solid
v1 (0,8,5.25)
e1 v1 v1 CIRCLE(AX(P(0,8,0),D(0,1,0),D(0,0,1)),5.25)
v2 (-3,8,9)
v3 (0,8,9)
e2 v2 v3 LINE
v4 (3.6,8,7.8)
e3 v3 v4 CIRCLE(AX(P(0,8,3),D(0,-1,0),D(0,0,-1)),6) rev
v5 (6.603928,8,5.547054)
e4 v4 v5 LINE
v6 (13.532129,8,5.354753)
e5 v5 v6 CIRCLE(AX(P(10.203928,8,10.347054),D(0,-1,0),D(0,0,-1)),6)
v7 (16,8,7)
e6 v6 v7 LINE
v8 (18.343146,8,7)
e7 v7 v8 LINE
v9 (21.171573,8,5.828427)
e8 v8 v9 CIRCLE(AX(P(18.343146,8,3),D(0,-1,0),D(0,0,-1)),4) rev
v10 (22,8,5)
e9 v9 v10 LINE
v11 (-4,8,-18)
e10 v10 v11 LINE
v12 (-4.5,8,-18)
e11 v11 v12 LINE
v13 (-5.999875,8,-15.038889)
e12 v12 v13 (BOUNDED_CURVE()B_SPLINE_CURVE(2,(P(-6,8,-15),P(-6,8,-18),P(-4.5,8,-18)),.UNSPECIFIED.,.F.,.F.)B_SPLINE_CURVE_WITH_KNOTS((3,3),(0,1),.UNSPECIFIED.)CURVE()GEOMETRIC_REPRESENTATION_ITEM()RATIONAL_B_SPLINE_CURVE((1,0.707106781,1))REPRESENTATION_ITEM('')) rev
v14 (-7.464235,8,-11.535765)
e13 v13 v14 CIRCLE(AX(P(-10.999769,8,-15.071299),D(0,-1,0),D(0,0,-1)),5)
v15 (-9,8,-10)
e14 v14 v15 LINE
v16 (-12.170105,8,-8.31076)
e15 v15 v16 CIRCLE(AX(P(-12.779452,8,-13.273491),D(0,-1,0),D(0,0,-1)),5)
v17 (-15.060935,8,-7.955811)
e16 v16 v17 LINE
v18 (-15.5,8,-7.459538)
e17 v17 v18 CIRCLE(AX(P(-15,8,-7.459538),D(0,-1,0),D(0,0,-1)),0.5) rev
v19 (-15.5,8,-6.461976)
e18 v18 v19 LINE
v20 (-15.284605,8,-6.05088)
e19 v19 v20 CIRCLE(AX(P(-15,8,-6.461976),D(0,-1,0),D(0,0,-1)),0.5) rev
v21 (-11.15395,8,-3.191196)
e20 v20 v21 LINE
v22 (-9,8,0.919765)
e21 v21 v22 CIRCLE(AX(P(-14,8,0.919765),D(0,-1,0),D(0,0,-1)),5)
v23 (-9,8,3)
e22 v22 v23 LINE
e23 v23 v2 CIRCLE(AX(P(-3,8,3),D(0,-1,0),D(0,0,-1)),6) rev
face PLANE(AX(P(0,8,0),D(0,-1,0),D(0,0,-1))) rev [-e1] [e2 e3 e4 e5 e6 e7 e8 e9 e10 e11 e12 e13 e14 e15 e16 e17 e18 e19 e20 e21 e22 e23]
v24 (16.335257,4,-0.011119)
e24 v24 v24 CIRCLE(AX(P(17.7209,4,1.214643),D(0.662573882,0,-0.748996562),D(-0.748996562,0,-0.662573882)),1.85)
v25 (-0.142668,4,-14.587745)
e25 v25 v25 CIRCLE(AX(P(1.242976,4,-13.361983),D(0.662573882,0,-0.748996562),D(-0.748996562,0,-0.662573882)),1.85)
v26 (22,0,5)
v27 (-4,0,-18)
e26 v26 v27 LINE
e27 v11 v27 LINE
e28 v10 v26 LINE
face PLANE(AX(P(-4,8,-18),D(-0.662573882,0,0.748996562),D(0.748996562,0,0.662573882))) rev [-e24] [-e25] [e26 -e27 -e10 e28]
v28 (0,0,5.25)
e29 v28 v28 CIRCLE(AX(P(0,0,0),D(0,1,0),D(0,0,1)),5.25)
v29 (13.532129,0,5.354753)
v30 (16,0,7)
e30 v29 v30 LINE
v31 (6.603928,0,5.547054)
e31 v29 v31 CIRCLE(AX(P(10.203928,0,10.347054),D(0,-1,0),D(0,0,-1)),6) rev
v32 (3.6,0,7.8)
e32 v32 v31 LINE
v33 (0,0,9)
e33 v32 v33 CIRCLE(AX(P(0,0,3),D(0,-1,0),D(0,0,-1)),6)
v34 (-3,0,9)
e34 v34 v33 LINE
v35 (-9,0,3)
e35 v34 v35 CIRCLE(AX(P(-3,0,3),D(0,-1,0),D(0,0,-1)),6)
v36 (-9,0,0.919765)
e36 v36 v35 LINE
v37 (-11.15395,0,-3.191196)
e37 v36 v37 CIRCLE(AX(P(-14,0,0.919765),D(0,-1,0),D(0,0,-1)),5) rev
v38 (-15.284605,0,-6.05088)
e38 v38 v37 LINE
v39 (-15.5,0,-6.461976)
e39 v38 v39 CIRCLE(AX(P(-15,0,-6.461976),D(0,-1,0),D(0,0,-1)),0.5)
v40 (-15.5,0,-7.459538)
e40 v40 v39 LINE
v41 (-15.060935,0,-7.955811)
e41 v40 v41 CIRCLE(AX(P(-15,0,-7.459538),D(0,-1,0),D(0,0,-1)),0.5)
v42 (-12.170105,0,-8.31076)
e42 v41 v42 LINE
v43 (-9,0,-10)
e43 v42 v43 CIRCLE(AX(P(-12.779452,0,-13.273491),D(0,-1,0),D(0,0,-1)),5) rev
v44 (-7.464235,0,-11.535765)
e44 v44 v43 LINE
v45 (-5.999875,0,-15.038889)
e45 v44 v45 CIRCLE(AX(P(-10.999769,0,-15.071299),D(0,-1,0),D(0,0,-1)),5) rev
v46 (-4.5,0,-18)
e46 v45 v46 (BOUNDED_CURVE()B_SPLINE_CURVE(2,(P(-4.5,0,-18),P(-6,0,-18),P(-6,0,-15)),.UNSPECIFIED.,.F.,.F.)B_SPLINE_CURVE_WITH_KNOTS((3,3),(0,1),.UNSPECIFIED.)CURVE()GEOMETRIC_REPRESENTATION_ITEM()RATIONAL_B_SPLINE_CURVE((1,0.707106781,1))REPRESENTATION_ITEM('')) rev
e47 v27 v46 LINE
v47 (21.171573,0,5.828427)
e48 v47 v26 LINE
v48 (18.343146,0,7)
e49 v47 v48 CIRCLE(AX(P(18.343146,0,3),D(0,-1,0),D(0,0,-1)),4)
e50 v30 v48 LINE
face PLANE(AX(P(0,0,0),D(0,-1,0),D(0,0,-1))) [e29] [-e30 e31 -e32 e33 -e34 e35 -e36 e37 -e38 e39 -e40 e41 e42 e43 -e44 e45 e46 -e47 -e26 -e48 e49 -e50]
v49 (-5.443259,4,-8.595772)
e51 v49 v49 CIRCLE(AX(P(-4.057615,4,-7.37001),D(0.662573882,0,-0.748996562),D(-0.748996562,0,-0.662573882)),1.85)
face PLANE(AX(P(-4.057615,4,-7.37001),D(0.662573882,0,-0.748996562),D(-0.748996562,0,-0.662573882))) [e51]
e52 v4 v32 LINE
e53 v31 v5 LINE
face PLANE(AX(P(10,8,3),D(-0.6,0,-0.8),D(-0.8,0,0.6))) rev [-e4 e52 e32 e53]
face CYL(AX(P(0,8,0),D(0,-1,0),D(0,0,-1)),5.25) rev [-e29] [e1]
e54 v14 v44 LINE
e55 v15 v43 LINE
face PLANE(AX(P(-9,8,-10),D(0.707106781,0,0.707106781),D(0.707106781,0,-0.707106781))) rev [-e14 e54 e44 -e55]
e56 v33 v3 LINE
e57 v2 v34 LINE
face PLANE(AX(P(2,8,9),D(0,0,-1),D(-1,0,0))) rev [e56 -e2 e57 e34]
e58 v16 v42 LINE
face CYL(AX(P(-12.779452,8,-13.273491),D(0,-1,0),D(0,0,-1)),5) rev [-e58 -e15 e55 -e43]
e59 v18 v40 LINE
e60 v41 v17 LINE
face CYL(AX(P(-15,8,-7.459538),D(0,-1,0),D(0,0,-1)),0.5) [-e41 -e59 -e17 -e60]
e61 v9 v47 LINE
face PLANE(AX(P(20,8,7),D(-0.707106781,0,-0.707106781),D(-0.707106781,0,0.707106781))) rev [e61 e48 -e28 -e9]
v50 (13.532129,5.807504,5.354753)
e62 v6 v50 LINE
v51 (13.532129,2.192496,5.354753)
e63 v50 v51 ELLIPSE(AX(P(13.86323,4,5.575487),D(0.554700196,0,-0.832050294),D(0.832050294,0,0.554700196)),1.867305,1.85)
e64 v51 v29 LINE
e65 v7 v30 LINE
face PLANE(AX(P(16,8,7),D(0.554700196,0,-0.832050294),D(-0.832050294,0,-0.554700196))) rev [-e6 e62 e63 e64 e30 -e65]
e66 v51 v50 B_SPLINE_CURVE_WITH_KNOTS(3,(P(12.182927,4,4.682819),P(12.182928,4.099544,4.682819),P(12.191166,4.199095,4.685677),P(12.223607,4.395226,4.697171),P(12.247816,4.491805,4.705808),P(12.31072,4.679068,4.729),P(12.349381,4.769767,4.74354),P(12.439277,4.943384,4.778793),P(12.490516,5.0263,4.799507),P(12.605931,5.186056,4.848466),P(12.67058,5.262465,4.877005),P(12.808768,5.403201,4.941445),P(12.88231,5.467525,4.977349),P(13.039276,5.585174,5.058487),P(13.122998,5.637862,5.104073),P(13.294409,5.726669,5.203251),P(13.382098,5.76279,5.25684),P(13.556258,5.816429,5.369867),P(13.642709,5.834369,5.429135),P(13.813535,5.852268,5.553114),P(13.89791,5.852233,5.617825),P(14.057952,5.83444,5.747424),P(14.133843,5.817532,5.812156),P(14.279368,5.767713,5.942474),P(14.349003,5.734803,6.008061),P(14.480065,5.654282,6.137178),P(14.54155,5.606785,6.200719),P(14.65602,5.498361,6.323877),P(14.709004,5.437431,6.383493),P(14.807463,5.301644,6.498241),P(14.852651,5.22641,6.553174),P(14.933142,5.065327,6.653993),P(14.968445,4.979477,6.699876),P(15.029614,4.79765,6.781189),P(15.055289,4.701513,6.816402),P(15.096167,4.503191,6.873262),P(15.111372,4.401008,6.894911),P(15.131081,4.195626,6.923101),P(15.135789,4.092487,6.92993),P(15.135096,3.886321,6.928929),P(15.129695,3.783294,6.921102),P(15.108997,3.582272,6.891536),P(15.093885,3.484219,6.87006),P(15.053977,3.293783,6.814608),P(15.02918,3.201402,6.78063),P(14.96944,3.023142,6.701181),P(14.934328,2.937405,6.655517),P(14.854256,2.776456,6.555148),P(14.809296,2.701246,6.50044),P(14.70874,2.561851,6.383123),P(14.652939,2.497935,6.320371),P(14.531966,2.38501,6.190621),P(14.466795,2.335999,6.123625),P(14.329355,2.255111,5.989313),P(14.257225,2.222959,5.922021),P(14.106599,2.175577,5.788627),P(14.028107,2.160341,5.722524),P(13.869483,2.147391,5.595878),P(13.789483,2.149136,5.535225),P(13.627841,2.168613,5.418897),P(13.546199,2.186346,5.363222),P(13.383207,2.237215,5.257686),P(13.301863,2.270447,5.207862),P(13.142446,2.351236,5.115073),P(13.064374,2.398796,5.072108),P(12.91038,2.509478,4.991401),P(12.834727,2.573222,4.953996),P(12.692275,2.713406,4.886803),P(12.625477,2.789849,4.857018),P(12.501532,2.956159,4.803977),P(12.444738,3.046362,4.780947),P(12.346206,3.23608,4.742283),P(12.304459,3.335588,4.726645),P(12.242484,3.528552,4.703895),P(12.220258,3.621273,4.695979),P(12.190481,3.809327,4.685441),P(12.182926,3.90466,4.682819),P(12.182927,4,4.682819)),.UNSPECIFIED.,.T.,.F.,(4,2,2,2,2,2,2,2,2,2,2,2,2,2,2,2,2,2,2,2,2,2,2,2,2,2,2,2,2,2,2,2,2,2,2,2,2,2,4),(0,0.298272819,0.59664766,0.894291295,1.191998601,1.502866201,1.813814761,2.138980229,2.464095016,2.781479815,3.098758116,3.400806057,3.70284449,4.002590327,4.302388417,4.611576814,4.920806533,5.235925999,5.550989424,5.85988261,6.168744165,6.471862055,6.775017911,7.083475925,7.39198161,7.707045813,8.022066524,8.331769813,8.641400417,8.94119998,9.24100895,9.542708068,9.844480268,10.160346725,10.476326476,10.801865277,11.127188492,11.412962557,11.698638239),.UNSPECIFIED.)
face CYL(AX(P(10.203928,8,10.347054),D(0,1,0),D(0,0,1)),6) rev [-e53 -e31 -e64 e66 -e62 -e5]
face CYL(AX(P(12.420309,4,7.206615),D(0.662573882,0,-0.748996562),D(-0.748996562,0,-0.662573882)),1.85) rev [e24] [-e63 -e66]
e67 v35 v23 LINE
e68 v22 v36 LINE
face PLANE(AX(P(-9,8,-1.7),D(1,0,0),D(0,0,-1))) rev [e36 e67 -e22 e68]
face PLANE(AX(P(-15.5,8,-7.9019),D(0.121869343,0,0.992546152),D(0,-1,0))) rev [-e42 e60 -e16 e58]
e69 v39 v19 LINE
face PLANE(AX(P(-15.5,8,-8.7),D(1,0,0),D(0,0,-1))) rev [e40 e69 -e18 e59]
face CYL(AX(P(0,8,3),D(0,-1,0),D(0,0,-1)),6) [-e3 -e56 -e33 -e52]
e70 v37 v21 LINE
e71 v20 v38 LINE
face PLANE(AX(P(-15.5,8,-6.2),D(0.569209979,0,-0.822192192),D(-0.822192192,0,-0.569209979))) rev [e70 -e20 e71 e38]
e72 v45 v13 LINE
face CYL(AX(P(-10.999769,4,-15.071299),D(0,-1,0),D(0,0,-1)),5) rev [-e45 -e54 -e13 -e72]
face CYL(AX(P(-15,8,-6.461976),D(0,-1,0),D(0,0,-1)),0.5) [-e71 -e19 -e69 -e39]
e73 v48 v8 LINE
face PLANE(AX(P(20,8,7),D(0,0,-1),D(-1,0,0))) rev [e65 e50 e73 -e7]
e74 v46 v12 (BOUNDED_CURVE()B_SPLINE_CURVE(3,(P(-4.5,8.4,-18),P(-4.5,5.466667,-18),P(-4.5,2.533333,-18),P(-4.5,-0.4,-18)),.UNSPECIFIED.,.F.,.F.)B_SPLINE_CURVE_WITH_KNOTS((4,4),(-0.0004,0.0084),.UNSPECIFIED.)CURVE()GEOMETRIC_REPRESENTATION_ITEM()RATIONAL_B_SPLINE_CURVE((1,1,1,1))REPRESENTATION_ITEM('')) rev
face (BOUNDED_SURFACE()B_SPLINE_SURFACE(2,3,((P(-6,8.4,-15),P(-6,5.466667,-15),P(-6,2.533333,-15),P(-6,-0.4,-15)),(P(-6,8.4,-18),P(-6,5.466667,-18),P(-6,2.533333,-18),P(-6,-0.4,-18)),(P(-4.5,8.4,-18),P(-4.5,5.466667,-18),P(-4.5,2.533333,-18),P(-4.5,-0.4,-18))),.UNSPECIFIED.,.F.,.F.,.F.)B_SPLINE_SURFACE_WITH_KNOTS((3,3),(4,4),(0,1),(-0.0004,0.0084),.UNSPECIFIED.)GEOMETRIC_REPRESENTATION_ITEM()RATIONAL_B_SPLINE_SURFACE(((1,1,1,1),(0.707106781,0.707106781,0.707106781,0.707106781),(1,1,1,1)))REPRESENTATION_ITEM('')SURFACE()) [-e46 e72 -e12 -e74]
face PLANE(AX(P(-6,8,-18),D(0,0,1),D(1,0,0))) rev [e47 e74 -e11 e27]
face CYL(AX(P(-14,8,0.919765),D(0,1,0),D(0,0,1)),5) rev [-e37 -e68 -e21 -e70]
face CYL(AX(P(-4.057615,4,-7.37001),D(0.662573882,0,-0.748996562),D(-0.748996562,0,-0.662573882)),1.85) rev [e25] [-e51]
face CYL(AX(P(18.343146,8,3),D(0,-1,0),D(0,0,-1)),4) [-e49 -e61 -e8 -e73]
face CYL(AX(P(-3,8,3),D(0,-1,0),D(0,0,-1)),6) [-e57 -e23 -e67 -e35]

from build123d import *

# Parameters (mm, degrees)
SKETCH1_R           = 5.25
BOSS_EXTRUDE1_DEPTH = 8
FILLET1_SIZE        = 1.5
FILLET1_SIZE_2      = 3
FILLET2_R           = 5
CHAMFER1_SIZE2      = 0.798099646
CHAMFER1_SIZE       = 6.5
FILLET4_DEPTH       = 8
FILLET5_R           = 0.5
FILLET6_R           = 6
SKETCH2_R           = 1.85
CUT_EXTRUDE1_DEPTH  = 8
FILLET7_R           = 4


with BuildPart() as part:
    # Sketch1 → Boss-Extrude1 (new body)
    with BuildSketch(Plane(origin=(0, 0, 0), x_dir=(1, 0, 0), z_dir=(0, 1, 0))):
        Polygon((20, -7), (22, -5), (-4, 18), (-6, 18), (-6, 13), (-9, 10), (-9, 8.7), (-15.5, 8.7), (-15.5, 6.2), (-9, 1.7), (-9, -9), (2, -9), (10, -3), (16, -7), align=None)
        with Locations(Location((0, 0, 0), (0, 0, 270))):
            Circle(SKETCH1_R, mode=Mode.SUBTRACT)
    extrude(amount=BOSS_EXTRUDE1_DEPTH)

    # Fillet1
    # a fillet whose section is not a circle: 3, 1.5 mm, written as the material it takes off along each edge
    with BuildSketch(Plane(origin=(-6, -7.5, -18), x_dir=(1, 0, 0), z_dir=(0, 1, 0))) as fillet1_piece_1:
        with BuildLine():
            Bezier((FILLET1_SIZE, 0), (0, 0), (0, -FILLET1_SIZE_2), weights=[1, 0.707106781, 1])
            Line((0, -FILLET1_SIZE_2), (0, 0))
            Line((0, 0), (FILLET1_SIZE, 0))
        make_face()
    extrude(amount=23, mode=Mode.SUBTRACT)

    # Fillet2
    fillet2_edges = [part.edges().sort_by_distance(p)[0] for p in [
        (-6, 4, -13),
    ]]
    fillet(fillet2_edges, radius=FILLET2_R)

    # Chamfer1
    chamfer1_edges = [part.edges().sort_by_distance(p)[0] for p in [
        (-15.5, 4, -8.7),
    ]]
    chamfer1_side = [part.faces().sort_by_distance(p)[0] for p in [
        (-15.484038007, 4, -8.7),
    ]]
    chamfer(chamfer1_edges, length=CHAMFER1_SIZE - 0.0001, length2=CHAMFER1_SIZE2 - 0.0001, reference=chamfer1_side[0])  # a hair under: the kernel refuses the full size

    # Fillet4: read off the stored shape, not the designer's step
    # Fillet4 outline → Fillet4 (add)
    with BuildSketch(Plane(origin=(0, 0, 0), x_dir=(1, 0, 0), z_dir=(0, 1, 0))):
        with BuildLine():
            ThreePointArc((-11.153950106, 3.191196227), (-9.57110344, 1.40076867), (-9, -0.919764731))
            Line((-9, -0.919764731), (-9, 1.7))
            Line((-9, 1.7), (-11.153950106, 3.191196227))
        make_face()
        with BuildLine():
            Line((-9, 8.7), (-9, 10))
            ThreePointArc((-9, 10), (-10.428118078, 8.860869286), (-12.170105392, 8.310760001))
            Line((-12.170105392, 8.310760001), (-9, 8.7))
        make_face()
    extrude(amount=FILLET4_DEPTH)

    # Fillet5
    fillet5_edges = [part.edges().sort_by_distance(p)[0] for p in [
        (-15.5, 4, -6.2),
        (-15.5, 4, -7.902000354),
    ]]
    fillet(fillet5_edges, radius=FILLET5_R)

    # Fillet6
    fillet6_edges = [part.edges().sort_by_distance(p)[0] for p in [
        (10, 4, 3),
        (2, 4, 9),
        (-9, 4, 9),
    ]]
    fillet(fillet6_edges, radius=FILLET6_R)

    # Sketch2 → Cut-Extrude1 (cut)
    with BuildSketch(Plane(origin=(7.176763485, 0, -8.112863071), x_dir=(-0.7489965624903806, 0, -0.662573882203029), z_dir=(0.662573882203029, 0, -0.7489965624903806))):
        with Locations((7.92231613, 4)):
            Circle(SKETCH2_R)
        with Locations((-14.07768387, 4)):
            Circle(SKETCH2_R)
    extrude(amount=-CUT_EXTRUDE1_DEPTH, mode=Mode.SUBTRACT)

    # Fillet7
    fillet7_edges = [part.edges().sort_by_distance(p)[0] for p in [
        (20, 4, 7),
    ]]
    fillet(fillet7_edges, radius=FILLET7_R)


solid = part.part
